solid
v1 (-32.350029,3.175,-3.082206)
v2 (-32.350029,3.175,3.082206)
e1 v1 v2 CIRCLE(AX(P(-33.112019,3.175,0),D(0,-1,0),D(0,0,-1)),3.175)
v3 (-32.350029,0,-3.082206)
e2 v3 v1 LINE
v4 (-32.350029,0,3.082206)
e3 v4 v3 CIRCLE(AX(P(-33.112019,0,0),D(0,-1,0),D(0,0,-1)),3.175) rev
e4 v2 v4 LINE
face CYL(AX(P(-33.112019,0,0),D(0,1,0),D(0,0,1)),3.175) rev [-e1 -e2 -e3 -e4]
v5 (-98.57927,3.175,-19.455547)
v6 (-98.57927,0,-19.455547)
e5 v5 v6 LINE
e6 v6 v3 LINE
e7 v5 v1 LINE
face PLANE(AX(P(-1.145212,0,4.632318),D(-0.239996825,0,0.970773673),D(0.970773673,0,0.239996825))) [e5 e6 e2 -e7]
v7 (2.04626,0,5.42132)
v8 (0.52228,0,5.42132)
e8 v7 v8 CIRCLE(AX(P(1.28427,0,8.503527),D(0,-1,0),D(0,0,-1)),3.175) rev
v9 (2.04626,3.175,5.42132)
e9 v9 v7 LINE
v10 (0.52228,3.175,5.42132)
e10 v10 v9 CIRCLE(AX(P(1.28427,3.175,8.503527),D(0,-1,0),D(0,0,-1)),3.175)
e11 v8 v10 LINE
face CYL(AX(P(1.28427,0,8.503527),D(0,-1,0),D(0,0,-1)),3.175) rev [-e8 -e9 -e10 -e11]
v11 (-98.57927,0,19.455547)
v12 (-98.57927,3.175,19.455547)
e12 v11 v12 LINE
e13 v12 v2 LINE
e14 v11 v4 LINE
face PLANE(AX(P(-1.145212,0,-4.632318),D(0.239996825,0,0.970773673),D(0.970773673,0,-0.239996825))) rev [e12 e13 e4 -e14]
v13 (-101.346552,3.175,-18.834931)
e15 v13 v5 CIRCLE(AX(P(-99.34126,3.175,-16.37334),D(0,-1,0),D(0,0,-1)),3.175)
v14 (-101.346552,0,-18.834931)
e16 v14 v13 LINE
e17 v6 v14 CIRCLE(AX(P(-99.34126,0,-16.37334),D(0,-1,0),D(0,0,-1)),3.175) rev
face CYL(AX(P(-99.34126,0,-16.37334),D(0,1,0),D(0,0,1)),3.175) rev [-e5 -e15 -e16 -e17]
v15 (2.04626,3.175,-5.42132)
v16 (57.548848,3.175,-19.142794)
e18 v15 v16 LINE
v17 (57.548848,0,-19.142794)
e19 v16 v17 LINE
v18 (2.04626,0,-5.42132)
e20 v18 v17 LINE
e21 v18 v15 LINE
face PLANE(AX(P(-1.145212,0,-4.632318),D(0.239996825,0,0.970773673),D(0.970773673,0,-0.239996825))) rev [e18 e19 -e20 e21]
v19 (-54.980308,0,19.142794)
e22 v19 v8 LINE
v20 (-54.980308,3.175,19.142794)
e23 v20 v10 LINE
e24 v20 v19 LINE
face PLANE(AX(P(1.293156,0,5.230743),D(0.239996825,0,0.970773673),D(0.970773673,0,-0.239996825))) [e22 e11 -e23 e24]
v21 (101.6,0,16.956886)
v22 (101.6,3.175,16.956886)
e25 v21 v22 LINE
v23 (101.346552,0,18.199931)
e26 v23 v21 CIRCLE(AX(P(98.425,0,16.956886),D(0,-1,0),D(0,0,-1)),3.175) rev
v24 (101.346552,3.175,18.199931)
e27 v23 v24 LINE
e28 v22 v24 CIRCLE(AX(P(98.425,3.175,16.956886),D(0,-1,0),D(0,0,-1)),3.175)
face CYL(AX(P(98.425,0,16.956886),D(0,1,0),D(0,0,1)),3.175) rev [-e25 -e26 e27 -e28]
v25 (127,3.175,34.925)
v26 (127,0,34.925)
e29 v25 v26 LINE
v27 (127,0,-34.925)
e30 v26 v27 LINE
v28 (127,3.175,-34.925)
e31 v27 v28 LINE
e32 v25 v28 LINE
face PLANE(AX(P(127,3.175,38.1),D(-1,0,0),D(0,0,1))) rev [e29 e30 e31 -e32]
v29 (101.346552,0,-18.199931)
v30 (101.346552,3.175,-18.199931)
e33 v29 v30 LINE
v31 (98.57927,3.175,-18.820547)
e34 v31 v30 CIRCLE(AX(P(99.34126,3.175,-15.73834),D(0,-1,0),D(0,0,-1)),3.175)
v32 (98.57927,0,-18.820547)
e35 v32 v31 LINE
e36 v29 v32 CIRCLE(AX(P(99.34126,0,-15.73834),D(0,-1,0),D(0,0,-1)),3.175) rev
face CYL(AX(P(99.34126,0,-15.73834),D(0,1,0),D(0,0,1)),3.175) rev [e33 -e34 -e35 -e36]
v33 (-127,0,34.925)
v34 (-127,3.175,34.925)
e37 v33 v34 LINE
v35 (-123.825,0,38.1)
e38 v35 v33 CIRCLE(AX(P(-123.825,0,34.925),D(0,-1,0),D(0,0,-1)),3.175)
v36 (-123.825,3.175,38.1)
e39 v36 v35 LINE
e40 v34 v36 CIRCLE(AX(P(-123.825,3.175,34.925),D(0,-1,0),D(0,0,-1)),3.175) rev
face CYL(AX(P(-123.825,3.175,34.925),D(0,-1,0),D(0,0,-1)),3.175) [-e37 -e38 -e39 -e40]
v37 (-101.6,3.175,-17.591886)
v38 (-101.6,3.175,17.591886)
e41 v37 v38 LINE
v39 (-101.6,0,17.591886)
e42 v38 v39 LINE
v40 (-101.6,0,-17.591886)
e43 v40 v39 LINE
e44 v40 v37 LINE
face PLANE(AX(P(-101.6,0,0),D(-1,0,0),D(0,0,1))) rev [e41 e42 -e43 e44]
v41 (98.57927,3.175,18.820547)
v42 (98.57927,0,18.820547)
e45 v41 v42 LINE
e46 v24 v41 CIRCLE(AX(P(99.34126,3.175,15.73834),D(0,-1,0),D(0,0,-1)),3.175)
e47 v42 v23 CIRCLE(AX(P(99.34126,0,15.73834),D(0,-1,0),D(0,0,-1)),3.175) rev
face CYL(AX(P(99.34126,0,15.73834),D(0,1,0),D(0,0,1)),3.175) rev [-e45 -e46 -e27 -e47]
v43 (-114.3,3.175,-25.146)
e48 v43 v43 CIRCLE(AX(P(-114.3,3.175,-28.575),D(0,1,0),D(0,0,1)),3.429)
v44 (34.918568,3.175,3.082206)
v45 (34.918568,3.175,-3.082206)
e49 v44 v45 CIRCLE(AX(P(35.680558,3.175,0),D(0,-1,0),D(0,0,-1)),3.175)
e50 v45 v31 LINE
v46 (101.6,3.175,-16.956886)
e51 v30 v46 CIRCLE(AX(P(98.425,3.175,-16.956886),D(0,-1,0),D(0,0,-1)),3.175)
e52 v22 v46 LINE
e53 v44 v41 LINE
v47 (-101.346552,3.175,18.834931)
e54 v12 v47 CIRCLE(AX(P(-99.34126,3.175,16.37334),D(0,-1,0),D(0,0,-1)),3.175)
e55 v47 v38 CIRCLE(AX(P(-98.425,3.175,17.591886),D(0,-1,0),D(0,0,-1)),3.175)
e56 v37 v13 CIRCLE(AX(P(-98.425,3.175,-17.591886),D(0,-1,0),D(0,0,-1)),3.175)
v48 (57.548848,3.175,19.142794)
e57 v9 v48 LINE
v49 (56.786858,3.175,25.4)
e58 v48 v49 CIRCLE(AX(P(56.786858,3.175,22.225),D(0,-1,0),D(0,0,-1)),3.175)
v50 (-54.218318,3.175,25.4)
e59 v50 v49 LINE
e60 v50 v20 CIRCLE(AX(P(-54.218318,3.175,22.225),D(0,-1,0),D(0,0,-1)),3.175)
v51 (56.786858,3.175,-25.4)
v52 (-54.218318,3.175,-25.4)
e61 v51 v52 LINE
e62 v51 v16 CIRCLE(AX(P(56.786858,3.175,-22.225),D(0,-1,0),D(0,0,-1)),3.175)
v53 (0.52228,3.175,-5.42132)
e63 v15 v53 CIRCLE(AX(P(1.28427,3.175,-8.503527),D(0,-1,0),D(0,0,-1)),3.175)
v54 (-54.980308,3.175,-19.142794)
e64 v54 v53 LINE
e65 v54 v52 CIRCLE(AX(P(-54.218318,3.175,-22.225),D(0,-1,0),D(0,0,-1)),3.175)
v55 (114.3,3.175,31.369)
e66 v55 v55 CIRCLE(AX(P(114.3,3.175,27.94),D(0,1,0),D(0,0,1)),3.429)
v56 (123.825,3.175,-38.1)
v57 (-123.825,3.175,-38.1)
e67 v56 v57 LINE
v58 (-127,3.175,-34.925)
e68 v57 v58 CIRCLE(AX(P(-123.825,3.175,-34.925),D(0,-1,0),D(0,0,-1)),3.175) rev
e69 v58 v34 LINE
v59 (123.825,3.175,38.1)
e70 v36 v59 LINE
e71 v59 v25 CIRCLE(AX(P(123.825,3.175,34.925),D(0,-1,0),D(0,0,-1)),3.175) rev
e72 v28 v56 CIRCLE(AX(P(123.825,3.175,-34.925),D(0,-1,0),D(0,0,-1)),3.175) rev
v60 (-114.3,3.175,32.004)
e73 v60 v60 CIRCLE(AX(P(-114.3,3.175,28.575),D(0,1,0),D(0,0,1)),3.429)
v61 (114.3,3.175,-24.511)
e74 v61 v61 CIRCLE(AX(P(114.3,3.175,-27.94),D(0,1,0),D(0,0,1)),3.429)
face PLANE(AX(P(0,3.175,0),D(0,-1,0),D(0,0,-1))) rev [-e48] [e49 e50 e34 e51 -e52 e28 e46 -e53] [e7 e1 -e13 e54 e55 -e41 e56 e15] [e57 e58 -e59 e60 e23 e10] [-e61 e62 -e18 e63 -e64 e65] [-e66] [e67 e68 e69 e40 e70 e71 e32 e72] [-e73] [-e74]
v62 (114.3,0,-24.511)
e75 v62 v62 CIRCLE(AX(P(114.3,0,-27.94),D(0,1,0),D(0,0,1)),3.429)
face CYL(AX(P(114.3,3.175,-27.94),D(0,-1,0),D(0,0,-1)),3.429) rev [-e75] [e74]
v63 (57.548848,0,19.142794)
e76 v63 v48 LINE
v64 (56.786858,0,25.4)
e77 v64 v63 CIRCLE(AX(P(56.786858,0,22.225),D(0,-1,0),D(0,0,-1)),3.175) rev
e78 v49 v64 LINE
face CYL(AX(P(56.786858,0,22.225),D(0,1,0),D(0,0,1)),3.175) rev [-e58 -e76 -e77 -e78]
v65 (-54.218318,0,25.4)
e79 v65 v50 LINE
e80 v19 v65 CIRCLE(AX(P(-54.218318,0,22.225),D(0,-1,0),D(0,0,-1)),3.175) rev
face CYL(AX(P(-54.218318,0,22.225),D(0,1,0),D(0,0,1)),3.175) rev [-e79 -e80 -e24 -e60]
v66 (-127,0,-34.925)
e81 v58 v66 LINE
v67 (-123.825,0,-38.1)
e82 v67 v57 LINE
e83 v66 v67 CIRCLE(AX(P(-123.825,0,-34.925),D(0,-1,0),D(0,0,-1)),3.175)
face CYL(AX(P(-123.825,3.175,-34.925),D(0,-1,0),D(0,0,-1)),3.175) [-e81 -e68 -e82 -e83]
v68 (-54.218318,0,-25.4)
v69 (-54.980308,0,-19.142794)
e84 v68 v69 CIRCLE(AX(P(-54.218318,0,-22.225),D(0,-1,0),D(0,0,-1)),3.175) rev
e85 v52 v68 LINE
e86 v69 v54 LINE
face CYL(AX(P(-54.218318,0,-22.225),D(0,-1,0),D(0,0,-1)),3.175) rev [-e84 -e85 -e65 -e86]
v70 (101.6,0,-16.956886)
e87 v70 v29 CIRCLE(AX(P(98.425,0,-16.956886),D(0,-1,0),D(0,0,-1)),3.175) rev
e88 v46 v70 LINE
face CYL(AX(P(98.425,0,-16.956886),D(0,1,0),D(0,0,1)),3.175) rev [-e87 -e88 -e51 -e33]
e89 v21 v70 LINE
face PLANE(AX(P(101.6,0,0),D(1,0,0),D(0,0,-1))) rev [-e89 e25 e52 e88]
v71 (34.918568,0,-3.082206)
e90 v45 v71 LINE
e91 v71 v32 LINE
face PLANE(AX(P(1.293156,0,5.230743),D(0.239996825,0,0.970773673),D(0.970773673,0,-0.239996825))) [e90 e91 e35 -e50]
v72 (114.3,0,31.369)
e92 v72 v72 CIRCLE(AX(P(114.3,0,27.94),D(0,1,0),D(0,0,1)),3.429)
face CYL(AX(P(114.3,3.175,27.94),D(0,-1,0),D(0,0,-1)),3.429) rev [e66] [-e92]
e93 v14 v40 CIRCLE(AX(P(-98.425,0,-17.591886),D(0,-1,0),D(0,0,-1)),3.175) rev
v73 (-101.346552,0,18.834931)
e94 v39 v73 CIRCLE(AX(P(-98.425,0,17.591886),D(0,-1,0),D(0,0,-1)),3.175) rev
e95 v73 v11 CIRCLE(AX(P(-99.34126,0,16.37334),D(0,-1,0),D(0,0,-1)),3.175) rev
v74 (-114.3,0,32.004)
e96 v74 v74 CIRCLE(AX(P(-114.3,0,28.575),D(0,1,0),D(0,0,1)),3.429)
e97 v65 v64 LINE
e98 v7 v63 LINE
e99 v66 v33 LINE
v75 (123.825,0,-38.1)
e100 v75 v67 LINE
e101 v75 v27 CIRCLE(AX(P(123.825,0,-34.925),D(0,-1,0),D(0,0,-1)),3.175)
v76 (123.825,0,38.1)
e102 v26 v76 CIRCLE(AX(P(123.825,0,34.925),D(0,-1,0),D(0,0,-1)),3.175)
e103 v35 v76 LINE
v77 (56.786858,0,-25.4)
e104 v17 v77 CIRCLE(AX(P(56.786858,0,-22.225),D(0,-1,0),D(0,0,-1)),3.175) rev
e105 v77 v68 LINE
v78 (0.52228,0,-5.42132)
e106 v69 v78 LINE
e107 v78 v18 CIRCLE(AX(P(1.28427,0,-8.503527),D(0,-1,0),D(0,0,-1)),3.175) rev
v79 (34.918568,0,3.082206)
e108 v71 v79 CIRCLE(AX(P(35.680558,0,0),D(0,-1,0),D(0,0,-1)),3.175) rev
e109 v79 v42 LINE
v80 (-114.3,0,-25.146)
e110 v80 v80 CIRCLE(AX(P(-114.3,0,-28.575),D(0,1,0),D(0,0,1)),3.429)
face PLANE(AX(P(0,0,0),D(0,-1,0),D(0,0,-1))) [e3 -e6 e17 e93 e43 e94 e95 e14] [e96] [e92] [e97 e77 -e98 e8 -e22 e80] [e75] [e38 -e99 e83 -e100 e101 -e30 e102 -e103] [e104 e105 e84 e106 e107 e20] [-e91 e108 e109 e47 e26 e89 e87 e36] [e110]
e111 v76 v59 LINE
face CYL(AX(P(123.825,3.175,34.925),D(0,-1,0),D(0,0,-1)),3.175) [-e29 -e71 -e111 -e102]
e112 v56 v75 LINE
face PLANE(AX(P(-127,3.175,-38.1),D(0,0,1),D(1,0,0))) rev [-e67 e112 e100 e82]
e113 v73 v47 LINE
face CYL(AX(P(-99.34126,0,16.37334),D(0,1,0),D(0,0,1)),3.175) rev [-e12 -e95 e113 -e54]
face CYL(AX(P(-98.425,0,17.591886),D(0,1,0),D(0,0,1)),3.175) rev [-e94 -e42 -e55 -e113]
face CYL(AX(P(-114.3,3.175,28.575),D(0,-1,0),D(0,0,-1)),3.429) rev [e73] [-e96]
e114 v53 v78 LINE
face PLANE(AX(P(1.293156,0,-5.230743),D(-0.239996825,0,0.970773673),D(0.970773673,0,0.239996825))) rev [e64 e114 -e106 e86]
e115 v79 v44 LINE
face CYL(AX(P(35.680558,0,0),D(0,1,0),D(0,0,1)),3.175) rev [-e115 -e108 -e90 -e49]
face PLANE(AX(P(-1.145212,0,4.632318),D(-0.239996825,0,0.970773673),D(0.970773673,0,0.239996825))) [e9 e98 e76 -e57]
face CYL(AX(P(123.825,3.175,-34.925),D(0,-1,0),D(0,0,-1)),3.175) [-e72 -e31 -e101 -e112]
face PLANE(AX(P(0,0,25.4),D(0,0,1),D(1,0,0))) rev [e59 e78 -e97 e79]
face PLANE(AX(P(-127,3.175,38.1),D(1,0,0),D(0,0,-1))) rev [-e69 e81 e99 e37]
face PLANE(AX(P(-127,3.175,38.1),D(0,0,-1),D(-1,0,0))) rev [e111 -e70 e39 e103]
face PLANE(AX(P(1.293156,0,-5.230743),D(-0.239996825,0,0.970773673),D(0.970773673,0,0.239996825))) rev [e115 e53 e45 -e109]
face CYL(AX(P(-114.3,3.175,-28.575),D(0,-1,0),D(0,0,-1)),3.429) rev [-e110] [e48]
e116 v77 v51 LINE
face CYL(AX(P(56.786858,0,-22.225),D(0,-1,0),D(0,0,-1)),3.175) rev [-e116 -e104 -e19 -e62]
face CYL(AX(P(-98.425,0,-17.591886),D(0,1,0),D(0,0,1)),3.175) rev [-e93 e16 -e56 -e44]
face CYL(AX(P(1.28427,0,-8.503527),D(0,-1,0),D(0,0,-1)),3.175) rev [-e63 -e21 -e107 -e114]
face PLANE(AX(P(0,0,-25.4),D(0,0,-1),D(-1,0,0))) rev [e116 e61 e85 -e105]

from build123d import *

# Parameters (mm, degrees)
SKETCH1_W           = 254
SKETCH1_H           = 76.2
SKETCH1_R           = 3.429
BOSS_EXTRUDE1_DEPTH = 3.175
FILLET1_R           = 3.175
CUT_EXTRUDE1_DEPTH  = 133.629900946
FILLET3_R           = 3.175


with BuildPart() as part:
    # Sketch1 → Boss-Extrude1 (new body)
    with BuildSketch(Plane(origin=(0, 0, 0), x_dir=(1, 0, 0), z_dir=(0, 1, 0))):
        Rectangle(SKETCH1_W, SKETCH1_H)
        with Locations(Location((-114.3, 28.575, 0), (0, 0, 270))):
            Circle(SKETCH1_R, mode=Mode.SUBTRACT)
        with Locations(Location((-114.3, -28.575, 0), (0, 0, 270))):
            Circle(SKETCH1_R, mode=Mode.SUBTRACT)
        with Locations(Location((114.3, 27.94, 0), (0, 0, 270))):
            Circle(SKETCH1_R, mode=Mode.SUBTRACT)
        with Locations(Location((114.3, -27.94, 0), (0, 0, 270))):
            Circle(SKETCH1_R, mode=Mode.SUBTRACT)
    extrude(amount=BOSS_EXTRUDE1_DEPTH)

    # Fillet1
    fillet1_edges = [part.edges().sort_by_distance(p)[0] for p in [
        (127, 1.5875, 38.1),
        (-127, 1.5875, 38.1),
        (-127, 1.5875, -38.1),
        (127, 1.5875, -38.1),
    ]]
    fillet(fillet1_edges, radius=FILLET1_R)

    # Sketch2 → Cut-Extrude1 (cut, through all)
    with BuildSketch(Plane(origin=(0, 3.175, 0), x_dir=(1, 0, 0), z_dir=(0, 1, 0))):
        with BuildLine():
            ThreePointArc((-100.658473406, 19.969571877), (-101.112278779, 19.289061706), (-101.6, 18.632432877))
            Line((-101.6, 18.632432877), (-101.6, -18.632432877))
            ThreePointArc((-101.6, -18.632432877), (-101.112278779, -19.289061706), (-100.658473406, -19.969571877))
            Line((-100.658473406, -19.969571877), (-19.882677051, 0))
            Line((-19.882677051, 0), (-100.658473406, 19.969571877))
        make_face()
        Polygon((82.858895983, 25.4), (-80.290356657, 25.4), (1.284269663, 5.232939604), align=None)
        Polygon((82.858895983, -25.4), (1.284269663, -5.232939604), (-80.290356657, -25.4), align=None)
        with BuildLine():
            Line((100.658473406, 19.334571877), (22.451216377, 0))
            Line((22.451216377, 0), (100.658473406, -19.334571877))
            ThreePointArc((100.658473406, -19.334571877), (101.112278779, -18.654061706), (101.6, -17.997432877))
            Line((101.6, -17.997432877), (101.6, 17.997432877))
            ThreePointArc((101.6, 17.997432877), (101.112278779, 18.654061706), (100.658473406, 19.334571877))
        make_face()
    extrude(amount=-CUT_EXTRUDE1_DEPTH, mode=Mode.SUBTRACT)

    # Fillet3
    # the kernel refuses this fillet: 3.175 mm, written as the material it adds along each edge
    with BuildSketch(Plane(origin=(100.658473406, 3.175, 19.334571877), x_dir=(-0.9707736729696135, 0, -0.23999682470625738), z_dir=(0, -1, 0)), Plane(origin=(-100.658473406, 3.175, -19.969571877), x_dir=(0.9707736729696127, 0, 0.23999682470626046), z_dir=(0, -1, 0))) as fillet3_piece_1:
        with BuildLine():
            CenterArc((2.141800615, 3.175), FILLET3_R, 205.317347828, 64.682652172)
            ThreePointArc((-0.728250522, 1.817269737), (-0.336527011, 0.919694558), (0, 0))
            Line((0, 0), (2.141800615, 0))
        make_face()
    extrude(amount=3.175)
    with BuildSketch(Plane(origin=(22.451216377, 3.175, 0), x_dir=(0.9707736729695857, 0, -0.23999682470636963), z_dir=(0, -1, 0)), Plane(origin=(-19.882677051, 3.175, 0), x_dir=(-0.9707736729695856, 0, 0.23999682470636988), z_dir=(0, -1, 0))) as fillet3_piece_2:
        with BuildLine():
            CenterArc((FILLET3_R * 4.04494382022, FILLET3_R), FILLET3_R, 117.772705909, 152.227294091)
            Line((FILLET3_R * 3.57897862218, FILLET3_R * 1.88480304826), (0, 0))
            Line((0, 0), (FILLET3_R * 4.04494382022, 0))
        make_face()
    extrude(amount=3.175)
    with BuildSketch(Plane(origin=(100.658473406, 3.175, -19.334571877), x_dir=(-0.970773672969613, 0, 0.23999682470625897), z_dir=(0, -1, 0))) as fillet3_piece_3:
        with BuildLine():
            CenterArc((2.141800615, -3.175), FILLET3_R, 90, 64.682652172)
            ThreePointArc((-0.728250522, -1.817269737), (-0.336527011, -0.919694558), (0, 0))
            Line((0, 0), (2.141800615, 0))
        make_face()
    extrude(amount=3.175)
    with BuildSketch(Plane(origin=(82.858895983, 3.175, -25.4), x_dir=(-0.9707736729695856, 0, 0.23999682470636996), z_dir=(0, -1, 0)), Plane(origin=(-80.290356657, 3.175, 25.4), x_dir=(0.9707736729695856, 0, -0.23999682470636974), z_dir=(0, -1, 0)), Plane(origin=(-80.290356657, 3.175, -25.4), x_dir=(1, 0, 0), z_dir=(0, -1, 0))) as fillet3_piece_4:
        with BuildLine():
            CenterArc((FILLET3_R * 8.21166561425, FILLET3_R), FILLET3_R, 103.886352954, 166.113647046)
            Line((FILLET3_R * 7.97166878954, FILLET3_R * 1.97077367297), (0, 0))
            Line((0, 0), (FILLET3_R * 8.21166561425, 0))
        make_face()
    extrude(amount=3.175)
    with BuildSketch(Plane(origin=(82.858895983, 3.175, 25.4), x_dir=(-0.9707736729695857, 0, -0.2399968247063698), z_dir=(0, -1, 0))) as fillet3_piece_5:
        with BuildLine():
            CenterArc((FILLET3_R * 8.21166561425, -FILLET3_R), FILLET3_R, 90, 166.113647046)
            Line((FILLET3_R * 7.97166878954, -FILLET3_R * 1.97077367297), (0, 0))
            Line((0, 0), (FILLET3_R * 8.21166561425, 0))
        make_face()
    extrude(amount=3.175)
    with BuildSketch(Plane(origin=(-100.658473406, 3.175, 19.969571877), x_dir=(-0.5838848021252715, 0, -0.811836521626819), z_dir=(0, -1, 0))) as fillet3_piece_6:
        with BuildLine():
            CenterArc((2.150451203, 3.169147283), FILLET3_R, 201.837892452, 64.682652172)
            Line((-0.796710862, 1.988105047), (0, 0))
            ThreePointArc((0, 0), (0.978879221, 0.029731803), (1.957758443, 0))
        make_face()
    extrude(amount=3.175)
    with BuildSketch(Plane(origin=(1.284269663, 3.175, -5.232939604), x_dir=(0.9707736729695848, 0, -0.23999682470637296), z_dir=(0, -1, 0))) as fillet3_piece_7:
        with BuildLine():
            CenterArc((FILLET3_R * 0.247222222222, -FILLET3_R), FILLET3_R, 90, 27.772705909)
            Line((-FILLET3_R * 0.21874297582, -FILLET3_R * 0.115196951738), (0, 0))
            Line((0, 0), (FILLET3_R * 0.247222222222, 0))
        make_face()
    extrude(amount=3.175)
    with BuildSketch(Plane(origin=(1.284269663, 3.175, 5.232939604), x_dir=(0.9707736729695816, 0, 0.23999682470638586), z_dir=(0, -1, 0))) as fillet3_piece_8:
        with BuildLine():
            CenterArc((FILLET3_R * 0.247222222222, FILLET3_R), FILLET3_R, 242.227294091, 27.772705909)
            Line((-FILLET3_R * 0.21874297582, FILLET3_R * 0.115196951738), (0, 0))
            Line((0, 0), (FILLET3_R * 0.247222222222, 0))
        make_face()
    extrude(amount=3.175)
    with BuildSketch(Plane(origin=(101.6, 3.175, -17.997432877), x_dir=(0, 0, 1), z_dir=(0, -1, 0)), Plane(origin=(-101.6, 3.175, 18.632432877), x_dir=(0, 0, -1), z_dir=(0, -1, 0))) as fillet3_piece_9:
        with BuildLine():
            CenterArc((1.040546779, 3.175), FILLET3_R, 235.322589412, 34.677410588)
            ThreePointArc((-0.765886428, 0.563980263), (-0.378785041, 0.28763694), (0, 0))
            Line((0, 0), (1.040546779, 0))
        make_face()
    extrude(amount=3.175)
    with BuildSketch(Plane(origin=(101.6, 3.175, 17.997432877), x_dir=(-0.5929556750159476, 0, 0.8052351007416294), z_dir=(0, -1, 0))) as fillet3_piece_10:
        with BuildLine():
            CenterArc((1.044749477, 3.173619563), FILLET3_R, 233.63296639, 34.677410588)
            Line((-0.837884791, 0.616998118), (0, 0))
            ThreePointArc((0, 0), (0.475566966, 0.007012621), (0.951133933, 0))
        make_face()
    extrude(amount=3.175)
    with BuildSketch(Plane(origin=(-101.6, 3.175, -18.632432877), x_dir=(0, 0, 1), z_dir=(0, -1, 0))) as fillet3_piece_11:
        with BuildLine():
            CenterArc((1.040546779, -3.175), FILLET3_R, 90, 34.677410588)
            ThreePointArc((-0.765886428, -0.563980263), (-0.378785041, -0.28763694), (0, 0))
            Line((0, 0), (1.040546779, 0))
        make_face()
    extrude(amount=3.175)


solid = part.part
